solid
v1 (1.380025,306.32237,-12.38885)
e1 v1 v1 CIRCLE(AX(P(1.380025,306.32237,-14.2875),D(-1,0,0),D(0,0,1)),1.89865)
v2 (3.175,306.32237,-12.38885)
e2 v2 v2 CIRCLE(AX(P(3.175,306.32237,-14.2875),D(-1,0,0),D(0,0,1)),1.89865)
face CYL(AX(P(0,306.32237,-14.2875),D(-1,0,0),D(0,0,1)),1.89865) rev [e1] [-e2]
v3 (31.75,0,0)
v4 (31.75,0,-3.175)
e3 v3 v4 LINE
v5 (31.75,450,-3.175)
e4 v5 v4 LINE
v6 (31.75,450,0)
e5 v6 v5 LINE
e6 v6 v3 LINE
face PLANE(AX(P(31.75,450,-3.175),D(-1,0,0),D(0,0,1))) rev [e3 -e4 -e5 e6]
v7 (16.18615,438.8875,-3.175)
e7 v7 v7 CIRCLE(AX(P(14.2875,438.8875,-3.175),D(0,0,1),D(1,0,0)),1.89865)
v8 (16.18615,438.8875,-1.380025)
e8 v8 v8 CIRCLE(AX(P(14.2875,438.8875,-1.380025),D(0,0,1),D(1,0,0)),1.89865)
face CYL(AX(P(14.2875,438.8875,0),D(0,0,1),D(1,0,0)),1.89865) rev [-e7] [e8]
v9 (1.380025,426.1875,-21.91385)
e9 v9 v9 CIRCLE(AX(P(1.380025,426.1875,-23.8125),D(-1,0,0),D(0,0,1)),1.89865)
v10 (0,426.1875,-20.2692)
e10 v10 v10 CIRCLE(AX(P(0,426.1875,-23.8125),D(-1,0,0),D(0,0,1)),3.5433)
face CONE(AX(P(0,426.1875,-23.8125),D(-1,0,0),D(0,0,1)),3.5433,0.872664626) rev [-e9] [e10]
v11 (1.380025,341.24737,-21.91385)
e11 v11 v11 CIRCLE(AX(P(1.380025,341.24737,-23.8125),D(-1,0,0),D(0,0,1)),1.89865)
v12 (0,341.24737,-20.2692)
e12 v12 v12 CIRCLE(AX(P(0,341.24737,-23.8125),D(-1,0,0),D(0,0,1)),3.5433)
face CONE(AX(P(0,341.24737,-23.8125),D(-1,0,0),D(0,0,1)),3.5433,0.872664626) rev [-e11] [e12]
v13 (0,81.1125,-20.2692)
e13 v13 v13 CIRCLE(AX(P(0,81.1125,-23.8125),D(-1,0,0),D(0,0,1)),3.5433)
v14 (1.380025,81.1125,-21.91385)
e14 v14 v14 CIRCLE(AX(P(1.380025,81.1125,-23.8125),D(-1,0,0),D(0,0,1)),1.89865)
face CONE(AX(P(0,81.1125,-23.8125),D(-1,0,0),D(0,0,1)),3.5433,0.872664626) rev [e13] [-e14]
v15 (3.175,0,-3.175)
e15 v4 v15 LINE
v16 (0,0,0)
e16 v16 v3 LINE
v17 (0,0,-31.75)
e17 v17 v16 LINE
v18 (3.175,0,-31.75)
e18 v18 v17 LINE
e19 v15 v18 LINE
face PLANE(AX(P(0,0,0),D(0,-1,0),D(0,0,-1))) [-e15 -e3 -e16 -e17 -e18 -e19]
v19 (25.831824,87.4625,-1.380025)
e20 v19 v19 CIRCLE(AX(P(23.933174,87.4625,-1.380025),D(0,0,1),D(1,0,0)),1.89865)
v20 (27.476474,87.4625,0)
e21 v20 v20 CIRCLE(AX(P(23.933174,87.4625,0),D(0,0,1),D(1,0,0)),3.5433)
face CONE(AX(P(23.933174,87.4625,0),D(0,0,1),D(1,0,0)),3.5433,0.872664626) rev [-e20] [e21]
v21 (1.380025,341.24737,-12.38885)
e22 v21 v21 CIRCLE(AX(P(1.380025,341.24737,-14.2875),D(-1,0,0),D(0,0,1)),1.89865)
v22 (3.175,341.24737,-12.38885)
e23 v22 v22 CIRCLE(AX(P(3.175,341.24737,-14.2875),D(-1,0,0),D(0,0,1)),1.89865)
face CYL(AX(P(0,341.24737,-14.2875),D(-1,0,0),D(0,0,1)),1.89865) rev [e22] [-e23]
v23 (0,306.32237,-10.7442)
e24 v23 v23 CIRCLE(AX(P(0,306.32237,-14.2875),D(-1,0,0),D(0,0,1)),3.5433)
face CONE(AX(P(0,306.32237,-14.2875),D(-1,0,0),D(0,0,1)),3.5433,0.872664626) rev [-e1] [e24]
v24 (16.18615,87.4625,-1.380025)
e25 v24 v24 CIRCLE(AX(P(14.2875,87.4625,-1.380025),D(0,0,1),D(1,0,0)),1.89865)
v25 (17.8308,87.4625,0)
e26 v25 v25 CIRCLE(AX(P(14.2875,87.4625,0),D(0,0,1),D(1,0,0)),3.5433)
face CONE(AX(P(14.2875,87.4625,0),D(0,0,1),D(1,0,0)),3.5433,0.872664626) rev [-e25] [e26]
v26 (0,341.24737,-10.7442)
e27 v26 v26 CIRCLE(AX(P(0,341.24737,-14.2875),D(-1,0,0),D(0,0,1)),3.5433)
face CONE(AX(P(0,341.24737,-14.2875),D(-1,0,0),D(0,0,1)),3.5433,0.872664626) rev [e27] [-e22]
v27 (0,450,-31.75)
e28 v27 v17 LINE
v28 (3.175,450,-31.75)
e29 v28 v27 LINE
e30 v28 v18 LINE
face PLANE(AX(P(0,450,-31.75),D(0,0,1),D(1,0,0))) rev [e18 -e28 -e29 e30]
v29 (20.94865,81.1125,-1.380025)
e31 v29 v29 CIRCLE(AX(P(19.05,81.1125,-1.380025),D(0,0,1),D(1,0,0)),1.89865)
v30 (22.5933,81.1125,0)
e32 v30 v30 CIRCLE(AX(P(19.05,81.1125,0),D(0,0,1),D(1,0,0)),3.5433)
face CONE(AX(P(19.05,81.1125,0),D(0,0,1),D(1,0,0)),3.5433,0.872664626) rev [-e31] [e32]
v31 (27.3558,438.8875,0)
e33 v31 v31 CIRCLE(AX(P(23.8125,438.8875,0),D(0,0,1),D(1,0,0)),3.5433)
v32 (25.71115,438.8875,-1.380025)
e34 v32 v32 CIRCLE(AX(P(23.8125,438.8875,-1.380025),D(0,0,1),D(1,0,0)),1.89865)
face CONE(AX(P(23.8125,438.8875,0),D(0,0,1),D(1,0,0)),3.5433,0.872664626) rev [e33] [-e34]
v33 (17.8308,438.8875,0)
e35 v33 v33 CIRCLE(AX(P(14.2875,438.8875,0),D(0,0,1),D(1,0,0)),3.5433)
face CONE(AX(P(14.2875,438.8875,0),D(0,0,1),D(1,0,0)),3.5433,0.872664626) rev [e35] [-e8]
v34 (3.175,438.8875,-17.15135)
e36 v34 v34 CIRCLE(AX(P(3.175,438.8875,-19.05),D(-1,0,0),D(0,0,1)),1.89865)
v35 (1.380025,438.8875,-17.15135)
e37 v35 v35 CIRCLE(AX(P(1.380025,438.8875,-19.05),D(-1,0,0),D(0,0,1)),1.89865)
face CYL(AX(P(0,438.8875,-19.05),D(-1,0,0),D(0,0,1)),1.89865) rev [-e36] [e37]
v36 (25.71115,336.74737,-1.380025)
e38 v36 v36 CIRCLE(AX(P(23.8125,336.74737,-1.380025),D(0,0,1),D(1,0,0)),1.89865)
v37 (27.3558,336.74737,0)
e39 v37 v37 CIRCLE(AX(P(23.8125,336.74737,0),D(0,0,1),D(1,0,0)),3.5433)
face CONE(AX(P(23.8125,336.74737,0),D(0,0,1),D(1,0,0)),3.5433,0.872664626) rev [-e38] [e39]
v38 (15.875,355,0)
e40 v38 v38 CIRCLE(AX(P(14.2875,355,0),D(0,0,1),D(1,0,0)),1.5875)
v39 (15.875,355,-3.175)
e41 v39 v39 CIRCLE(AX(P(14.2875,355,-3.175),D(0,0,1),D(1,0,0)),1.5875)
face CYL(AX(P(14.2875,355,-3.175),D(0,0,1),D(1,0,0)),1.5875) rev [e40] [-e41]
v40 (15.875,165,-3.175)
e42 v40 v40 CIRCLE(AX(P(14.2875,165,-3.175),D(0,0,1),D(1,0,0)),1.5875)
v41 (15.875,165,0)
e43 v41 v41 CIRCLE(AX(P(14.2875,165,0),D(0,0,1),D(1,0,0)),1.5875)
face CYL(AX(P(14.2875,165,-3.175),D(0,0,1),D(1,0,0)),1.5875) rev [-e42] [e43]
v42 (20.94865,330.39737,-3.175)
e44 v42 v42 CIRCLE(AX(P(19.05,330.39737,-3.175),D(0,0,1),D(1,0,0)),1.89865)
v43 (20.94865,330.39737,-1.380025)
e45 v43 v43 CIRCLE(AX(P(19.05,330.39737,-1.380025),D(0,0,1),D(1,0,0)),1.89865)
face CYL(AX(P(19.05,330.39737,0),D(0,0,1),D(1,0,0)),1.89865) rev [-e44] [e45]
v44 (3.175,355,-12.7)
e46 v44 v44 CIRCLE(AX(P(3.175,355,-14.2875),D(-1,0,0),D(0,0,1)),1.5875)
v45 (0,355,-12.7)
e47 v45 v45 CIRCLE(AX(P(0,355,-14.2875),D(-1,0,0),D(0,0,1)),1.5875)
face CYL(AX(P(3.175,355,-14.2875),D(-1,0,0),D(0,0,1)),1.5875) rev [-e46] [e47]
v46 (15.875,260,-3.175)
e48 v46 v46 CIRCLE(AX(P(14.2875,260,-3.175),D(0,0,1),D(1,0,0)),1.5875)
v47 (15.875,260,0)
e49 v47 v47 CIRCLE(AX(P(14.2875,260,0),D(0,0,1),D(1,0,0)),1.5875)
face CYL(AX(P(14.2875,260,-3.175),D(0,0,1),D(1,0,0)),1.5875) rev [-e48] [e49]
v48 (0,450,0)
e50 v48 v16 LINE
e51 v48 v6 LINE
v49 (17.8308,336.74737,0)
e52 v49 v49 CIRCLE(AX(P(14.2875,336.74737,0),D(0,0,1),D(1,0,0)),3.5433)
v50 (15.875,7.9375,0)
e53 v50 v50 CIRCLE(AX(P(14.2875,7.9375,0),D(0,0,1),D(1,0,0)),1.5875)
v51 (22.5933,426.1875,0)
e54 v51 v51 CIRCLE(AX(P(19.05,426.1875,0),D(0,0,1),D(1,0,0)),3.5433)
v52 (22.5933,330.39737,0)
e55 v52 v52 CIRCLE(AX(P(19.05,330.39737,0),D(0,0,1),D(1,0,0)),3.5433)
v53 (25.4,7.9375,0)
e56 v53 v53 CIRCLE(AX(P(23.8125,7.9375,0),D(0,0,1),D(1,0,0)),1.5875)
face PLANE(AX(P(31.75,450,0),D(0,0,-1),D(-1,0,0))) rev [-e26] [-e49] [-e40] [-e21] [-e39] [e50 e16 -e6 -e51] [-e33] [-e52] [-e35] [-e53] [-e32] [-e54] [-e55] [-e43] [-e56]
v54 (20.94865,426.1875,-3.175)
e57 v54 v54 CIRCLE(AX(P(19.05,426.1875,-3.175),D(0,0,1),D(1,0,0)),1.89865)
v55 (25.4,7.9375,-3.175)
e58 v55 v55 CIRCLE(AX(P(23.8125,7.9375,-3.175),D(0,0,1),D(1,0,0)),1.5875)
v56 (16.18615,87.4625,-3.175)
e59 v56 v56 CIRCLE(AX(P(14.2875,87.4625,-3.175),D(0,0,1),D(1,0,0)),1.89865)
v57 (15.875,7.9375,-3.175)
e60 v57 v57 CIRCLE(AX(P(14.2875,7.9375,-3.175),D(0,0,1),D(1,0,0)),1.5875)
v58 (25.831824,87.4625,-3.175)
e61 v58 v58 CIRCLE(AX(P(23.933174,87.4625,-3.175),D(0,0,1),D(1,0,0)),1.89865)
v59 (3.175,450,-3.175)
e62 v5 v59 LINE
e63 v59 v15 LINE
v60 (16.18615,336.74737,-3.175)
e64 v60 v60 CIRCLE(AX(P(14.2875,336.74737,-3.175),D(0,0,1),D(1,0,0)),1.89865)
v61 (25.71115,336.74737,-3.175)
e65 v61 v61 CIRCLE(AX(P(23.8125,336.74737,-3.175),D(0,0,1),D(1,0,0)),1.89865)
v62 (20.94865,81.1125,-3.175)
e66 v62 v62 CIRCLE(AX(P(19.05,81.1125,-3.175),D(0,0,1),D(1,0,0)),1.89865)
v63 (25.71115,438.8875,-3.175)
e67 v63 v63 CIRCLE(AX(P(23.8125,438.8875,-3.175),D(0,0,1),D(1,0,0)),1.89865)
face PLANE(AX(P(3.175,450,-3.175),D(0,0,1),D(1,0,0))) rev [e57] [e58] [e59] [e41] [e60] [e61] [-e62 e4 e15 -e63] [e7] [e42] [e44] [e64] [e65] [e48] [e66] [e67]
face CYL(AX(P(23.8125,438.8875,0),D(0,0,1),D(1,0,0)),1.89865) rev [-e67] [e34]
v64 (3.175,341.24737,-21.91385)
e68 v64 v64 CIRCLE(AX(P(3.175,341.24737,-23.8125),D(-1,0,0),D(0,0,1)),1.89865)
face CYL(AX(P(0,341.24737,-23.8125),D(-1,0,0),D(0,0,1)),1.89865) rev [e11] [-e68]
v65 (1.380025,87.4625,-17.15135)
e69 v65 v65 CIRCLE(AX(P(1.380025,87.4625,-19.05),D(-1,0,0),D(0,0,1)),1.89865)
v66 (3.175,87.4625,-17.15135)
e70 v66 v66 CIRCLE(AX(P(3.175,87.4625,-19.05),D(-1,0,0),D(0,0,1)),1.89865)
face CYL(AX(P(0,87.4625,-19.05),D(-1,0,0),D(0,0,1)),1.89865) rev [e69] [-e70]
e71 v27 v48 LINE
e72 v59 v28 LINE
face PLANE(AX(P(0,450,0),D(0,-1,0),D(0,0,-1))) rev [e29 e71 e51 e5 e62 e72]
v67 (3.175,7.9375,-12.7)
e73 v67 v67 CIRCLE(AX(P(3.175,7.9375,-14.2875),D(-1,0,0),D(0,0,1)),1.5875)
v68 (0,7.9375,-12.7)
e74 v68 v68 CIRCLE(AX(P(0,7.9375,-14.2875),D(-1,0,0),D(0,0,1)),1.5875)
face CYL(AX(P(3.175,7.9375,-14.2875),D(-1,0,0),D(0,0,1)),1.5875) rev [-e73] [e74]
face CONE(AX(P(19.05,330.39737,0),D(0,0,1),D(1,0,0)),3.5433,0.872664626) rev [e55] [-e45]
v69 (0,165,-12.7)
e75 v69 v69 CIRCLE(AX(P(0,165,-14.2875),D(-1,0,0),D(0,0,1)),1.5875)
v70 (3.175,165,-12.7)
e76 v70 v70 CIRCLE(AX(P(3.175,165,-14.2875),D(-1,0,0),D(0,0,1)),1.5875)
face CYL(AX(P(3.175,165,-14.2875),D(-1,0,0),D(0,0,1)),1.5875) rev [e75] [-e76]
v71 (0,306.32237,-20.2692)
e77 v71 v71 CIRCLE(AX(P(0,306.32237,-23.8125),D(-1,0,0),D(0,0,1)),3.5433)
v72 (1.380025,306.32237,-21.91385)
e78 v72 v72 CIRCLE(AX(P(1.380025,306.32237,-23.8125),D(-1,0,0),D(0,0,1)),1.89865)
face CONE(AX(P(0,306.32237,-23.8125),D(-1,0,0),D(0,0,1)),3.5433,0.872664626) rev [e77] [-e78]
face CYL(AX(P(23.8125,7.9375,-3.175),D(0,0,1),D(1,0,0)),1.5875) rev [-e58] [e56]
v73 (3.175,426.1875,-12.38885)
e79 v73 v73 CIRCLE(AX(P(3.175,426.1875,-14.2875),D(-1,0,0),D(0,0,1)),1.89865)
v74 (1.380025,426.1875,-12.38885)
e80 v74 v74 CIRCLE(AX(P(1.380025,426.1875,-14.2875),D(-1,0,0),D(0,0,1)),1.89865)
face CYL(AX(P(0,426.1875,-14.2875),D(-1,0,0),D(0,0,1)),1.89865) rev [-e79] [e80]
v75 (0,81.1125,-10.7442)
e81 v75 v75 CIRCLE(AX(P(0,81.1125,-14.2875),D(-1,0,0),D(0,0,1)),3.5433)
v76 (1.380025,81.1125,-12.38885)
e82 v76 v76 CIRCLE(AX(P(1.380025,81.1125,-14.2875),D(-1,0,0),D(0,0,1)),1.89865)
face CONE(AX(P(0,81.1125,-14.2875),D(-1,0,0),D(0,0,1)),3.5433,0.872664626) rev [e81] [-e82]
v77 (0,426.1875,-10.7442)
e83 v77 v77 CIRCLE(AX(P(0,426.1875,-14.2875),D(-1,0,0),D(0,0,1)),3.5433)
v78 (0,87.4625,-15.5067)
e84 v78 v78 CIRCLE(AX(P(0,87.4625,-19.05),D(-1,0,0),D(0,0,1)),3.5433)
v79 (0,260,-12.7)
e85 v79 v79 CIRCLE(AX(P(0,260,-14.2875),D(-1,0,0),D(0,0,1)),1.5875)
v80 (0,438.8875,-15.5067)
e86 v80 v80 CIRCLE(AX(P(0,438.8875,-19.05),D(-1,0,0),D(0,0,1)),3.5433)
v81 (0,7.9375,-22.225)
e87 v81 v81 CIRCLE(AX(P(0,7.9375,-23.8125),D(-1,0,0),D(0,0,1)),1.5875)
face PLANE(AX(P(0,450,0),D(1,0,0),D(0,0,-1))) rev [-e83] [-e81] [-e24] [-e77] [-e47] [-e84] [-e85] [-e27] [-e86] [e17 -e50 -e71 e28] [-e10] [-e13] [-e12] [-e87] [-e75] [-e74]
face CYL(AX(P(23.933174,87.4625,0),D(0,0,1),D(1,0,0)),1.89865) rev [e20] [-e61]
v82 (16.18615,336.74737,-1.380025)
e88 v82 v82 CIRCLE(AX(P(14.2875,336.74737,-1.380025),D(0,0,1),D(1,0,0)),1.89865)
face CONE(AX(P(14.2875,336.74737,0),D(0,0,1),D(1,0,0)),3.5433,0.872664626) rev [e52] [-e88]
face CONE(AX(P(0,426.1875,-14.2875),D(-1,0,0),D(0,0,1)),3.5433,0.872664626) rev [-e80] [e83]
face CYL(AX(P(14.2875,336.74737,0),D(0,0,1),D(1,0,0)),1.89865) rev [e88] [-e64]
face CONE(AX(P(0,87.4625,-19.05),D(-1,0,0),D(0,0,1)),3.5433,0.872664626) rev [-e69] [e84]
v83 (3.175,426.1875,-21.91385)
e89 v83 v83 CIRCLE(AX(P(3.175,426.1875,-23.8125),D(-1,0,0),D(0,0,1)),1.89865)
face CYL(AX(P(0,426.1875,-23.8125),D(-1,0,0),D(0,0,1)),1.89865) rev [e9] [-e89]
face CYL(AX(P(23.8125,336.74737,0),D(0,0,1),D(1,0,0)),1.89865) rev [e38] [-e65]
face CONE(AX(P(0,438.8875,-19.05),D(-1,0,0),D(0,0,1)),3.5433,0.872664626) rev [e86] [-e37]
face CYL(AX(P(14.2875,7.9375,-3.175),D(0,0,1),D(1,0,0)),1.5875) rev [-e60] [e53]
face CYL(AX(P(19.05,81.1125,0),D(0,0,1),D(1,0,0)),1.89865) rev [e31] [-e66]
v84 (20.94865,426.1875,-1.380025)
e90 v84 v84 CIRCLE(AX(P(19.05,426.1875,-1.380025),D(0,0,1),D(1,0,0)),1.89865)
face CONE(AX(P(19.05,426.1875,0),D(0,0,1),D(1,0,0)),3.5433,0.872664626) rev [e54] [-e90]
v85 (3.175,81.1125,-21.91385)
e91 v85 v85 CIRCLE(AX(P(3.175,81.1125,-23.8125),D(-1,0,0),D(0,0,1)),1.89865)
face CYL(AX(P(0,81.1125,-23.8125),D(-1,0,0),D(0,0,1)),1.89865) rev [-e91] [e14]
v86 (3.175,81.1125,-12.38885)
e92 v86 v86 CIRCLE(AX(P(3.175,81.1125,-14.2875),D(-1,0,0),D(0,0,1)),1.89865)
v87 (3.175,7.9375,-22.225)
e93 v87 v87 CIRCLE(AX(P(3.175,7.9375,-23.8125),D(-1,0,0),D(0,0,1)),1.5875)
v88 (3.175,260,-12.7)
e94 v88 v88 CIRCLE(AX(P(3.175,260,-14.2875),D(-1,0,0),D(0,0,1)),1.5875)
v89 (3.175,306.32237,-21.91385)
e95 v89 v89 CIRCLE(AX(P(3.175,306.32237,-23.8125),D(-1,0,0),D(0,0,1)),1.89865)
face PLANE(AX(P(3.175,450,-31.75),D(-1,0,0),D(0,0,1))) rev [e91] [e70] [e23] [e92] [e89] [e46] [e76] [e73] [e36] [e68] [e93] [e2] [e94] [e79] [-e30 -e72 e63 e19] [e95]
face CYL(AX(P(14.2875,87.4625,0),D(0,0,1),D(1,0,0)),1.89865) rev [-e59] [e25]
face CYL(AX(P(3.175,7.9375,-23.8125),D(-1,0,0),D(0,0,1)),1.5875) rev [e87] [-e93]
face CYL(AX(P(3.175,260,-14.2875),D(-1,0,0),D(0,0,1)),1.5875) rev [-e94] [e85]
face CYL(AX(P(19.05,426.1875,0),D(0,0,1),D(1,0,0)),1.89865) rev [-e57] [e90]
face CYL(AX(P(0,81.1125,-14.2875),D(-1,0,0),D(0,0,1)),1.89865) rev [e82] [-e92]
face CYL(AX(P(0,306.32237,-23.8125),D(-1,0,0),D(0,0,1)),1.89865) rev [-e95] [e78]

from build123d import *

# Parameters (mm, degrees)
BOSS_EXTRUDE1_DEPTH                               = 450
BACKSIDEHOLES_SKETCH3_R                           = 1.5875
BACKSIDEHOLES_CUT_EXTRUDE1_DEPTH                  = 3.175
RIGHTSIDEHOLES_CUT_EXTRUDE2_OUTLINE_R             = 1.5875
RIGHTSIDEHOLES_CUT_EXTRUDE2_DEPTH                 = 3.175
CSK_FOR_6_FLAT_HEAD_MACHINE_SCREW_100_D           = 3.7973
CSK_FOR_6_FLAT_HEAD_MACHINE_SCREW_100_CSINK_D     = 7.0866
CSK_FOR_6_FLAT_HEAD_MACHINE_SCREW_100_CSINK_ANGLE = 100
CSK_FOR_6_FLAT_HEAD_MACHINE_SCREW_2_D             = 3.7973
CSK_FOR_6_FLAT_HEAD_MACHINE_SCREW_2_CSINK_D       = 7.0866
CSK_FOR_6_FLAT_HEAD_MACHINE_SCREW_2_CSINK_ANGLE   = 100


# Read off the part's stored shape, not the designer's step: RightSideHoles-Cut-Extrude2
with BuildPart() as part:
    # Sketch2 → Boss-Extrude1 (new body)
    with BuildSketch(Plane(origin=(0, 0, 0), x_dir=(1, 0, 0), z_dir=(0, 1, 0))):
        Polygon((0, 31.75), (3.175, 31.75), (3.175, 3.175), (31.75, 3.175), (31.75, 0), (0, 0), align=None)
    extrude(amount=BOSS_EXTRUDE1_DEPTH)

    # BackSideHoles-Sketch3 → BackSideHoles-Cut-Extrude1 (cut)
    with BuildSketch(Plane.XY):
        with Locations((19.05, 81.1125)):
            Circle(BACKSIDEHOLES_SKETCH3_R)
        with Locations((14.2875, 87.4625)):
            Circle(BACKSIDEHOLES_SKETCH3_R)
        with Locations((23.933174186, 87.4625)):
            Circle(BACKSIDEHOLES_SKETCH3_R)
        with Locations((14.2875, 438.8875)):
            Circle(BACKSIDEHOLES_SKETCH3_R)
        with Locations((23.8125, 438.8875)):
            Circle(BACKSIDEHOLES_SKETCH3_R)
        with Locations((19.05, 426.1875)):
            Circle(BACKSIDEHOLES_SKETCH3_R)
        with Locations((14.2875, 336.74737)):
            Circle(BACKSIDEHOLES_SKETCH3_R)
        with Locations((23.8125, 336.74737)):
            Circle(BACKSIDEHOLES_SKETCH3_R)
        with Locations((19.05, 330.39737)):
            Circle(BACKSIDEHOLES_SKETCH3_R)
        with Locations((14.2875, 165)):
            Circle(BACKSIDEHOLES_SKETCH3_R)
        with Locations((14.2875, 260)):
            Circle(BACKSIDEHOLES_SKETCH3_R)
        with Locations((14.2875, 7.9375)):
            Circle(BACKSIDEHOLES_SKETCH3_R)
        with Locations((23.8125, 7.9375)):
            Circle(BACKSIDEHOLES_SKETCH3_R)
        with Locations((14.2875, 355)):
            Circle(BACKSIDEHOLES_SKETCH3_R)
    extrude(amount=-BACKSIDEHOLES_CUT_EXTRUDE1_DEPTH, mode=Mode.SUBTRACT)

    # RightSideHoles-Cut-Extrude2 outline → RightSideHoles-Cut-Extrude2 (cut)
    with BuildSketch(Plane.YZ):
        with Locations((81.1125, -23.8125)):
            Circle(RIGHTSIDEHOLES_CUT_EXTRUDE2_OUTLINE_R)
        with Locations((306.32237, -23.8125)):
            Circle(RIGHTSIDEHOLES_CUT_EXTRUDE2_OUTLINE_R)
        with Locations((341.24737, -14.2875)):
            Circle(RIGHTSIDEHOLES_CUT_EXTRUDE2_OUTLINE_R)
        with Locations((341.24737, -23.8125)):
            Circle(RIGHTSIDEHOLES_CUT_EXTRUDE2_OUTLINE_R)
        with Locations((165, -14.2875)):
            Circle(RIGHTSIDEHOLES_CUT_EXTRUDE2_OUTLINE_R)
        with Locations((306.32237, -14.2875)):
            Circle(RIGHTSIDEHOLES_CUT_EXTRUDE2_OUTLINE_R)
        with Locations((260, -14.2875)):
            Circle(RIGHTSIDEHOLES_CUT_EXTRUDE2_OUTLINE_R)
        with Locations((81.1125, -14.2875)):
            Circle(RIGHTSIDEHOLES_CUT_EXTRUDE2_OUTLINE_R)
        with Locations((87.4625, -19.05)):
            Circle(RIGHTSIDEHOLES_CUT_EXTRUDE2_OUTLINE_R)
        with Locations((355, -14.2875)):
            Circle(RIGHTSIDEHOLES_CUT_EXTRUDE2_OUTLINE_R)
        with Locations((438.8875, -19.05)):
            Circle(RIGHTSIDEHOLES_CUT_EXTRUDE2_OUTLINE_R)
        with Locations((426.1875, -14.2875)):
            Circle(RIGHTSIDEHOLES_CUT_EXTRUDE2_OUTLINE_R)
        with Locations((426.1875, -23.8125)):
            Circle(RIGHTSIDEHOLES_CUT_EXTRUDE2_OUTLINE_R)
        with Locations((7.9375, -23.8125)):
            Circle(RIGHTSIDEHOLES_CUT_EXTRUDE2_OUTLINE_R)
        with Locations((7.9375, -14.2875)):
            Circle(RIGHTSIDEHOLES_CUT_EXTRUDE2_OUTLINE_R)
    extrude(amount=RIGHTSIDEHOLES_CUT_EXTRUDE2_DEPTH, mode=Mode.SUBTRACT)

    # CSK for _6 Flat Head Machine Screw _100 (through all)
    with Locations(Plane.ZY):
        with Locations((-23.8125, 81.1125), (-19.05, 87.4625), (-14.2875, 81.1125), (-23.8125, 341.24737), (-14.2875, 341.24737), (-23.8125, 306.32237), (-14.2875, 306.32237), (-23.8125, 426.1875), (-14.2875, 426.1875), (-19.05, 438.8875)):
            CounterSinkHole(CSK_FOR_6_FLAT_HEAD_MACHINE_SCREW_100_D / 2, CSK_FOR_6_FLAT_HEAD_MACHINE_SCREW_100_CSINK_D / 2, counter_sink_angle=CSK_FOR_6_FLAT_HEAD_MACHINE_SCREW_100_CSINK_ANGLE)

    # CSK for _6 Flat Head Machine Screw _ 2 (through all)
    with Locations(Plane.XY):
        with Locations((14.2875, 336.74737), (23.8125, 336.74737), (19.05, 330.39737), (19.05, 426.1875), (23.8125, 438.8875), (14.2875, 438.8875), (14.2875, 87.4625), (23.933174186, 87.4625), (19.05, 81.1125)):
            CounterSinkHole(CSK_FOR_6_FLAT_HEAD_MACHINE_SCREW_2_D / 2, CSK_FOR_6_FLAT_HEAD_MACHINE_SCREW_2_CSINK_D / 2, counter_sink_angle=CSK_FOR_6_FLAT_HEAD_MACHINE_SCREW_2_CSINK_ANGLE)


solid = part.part
